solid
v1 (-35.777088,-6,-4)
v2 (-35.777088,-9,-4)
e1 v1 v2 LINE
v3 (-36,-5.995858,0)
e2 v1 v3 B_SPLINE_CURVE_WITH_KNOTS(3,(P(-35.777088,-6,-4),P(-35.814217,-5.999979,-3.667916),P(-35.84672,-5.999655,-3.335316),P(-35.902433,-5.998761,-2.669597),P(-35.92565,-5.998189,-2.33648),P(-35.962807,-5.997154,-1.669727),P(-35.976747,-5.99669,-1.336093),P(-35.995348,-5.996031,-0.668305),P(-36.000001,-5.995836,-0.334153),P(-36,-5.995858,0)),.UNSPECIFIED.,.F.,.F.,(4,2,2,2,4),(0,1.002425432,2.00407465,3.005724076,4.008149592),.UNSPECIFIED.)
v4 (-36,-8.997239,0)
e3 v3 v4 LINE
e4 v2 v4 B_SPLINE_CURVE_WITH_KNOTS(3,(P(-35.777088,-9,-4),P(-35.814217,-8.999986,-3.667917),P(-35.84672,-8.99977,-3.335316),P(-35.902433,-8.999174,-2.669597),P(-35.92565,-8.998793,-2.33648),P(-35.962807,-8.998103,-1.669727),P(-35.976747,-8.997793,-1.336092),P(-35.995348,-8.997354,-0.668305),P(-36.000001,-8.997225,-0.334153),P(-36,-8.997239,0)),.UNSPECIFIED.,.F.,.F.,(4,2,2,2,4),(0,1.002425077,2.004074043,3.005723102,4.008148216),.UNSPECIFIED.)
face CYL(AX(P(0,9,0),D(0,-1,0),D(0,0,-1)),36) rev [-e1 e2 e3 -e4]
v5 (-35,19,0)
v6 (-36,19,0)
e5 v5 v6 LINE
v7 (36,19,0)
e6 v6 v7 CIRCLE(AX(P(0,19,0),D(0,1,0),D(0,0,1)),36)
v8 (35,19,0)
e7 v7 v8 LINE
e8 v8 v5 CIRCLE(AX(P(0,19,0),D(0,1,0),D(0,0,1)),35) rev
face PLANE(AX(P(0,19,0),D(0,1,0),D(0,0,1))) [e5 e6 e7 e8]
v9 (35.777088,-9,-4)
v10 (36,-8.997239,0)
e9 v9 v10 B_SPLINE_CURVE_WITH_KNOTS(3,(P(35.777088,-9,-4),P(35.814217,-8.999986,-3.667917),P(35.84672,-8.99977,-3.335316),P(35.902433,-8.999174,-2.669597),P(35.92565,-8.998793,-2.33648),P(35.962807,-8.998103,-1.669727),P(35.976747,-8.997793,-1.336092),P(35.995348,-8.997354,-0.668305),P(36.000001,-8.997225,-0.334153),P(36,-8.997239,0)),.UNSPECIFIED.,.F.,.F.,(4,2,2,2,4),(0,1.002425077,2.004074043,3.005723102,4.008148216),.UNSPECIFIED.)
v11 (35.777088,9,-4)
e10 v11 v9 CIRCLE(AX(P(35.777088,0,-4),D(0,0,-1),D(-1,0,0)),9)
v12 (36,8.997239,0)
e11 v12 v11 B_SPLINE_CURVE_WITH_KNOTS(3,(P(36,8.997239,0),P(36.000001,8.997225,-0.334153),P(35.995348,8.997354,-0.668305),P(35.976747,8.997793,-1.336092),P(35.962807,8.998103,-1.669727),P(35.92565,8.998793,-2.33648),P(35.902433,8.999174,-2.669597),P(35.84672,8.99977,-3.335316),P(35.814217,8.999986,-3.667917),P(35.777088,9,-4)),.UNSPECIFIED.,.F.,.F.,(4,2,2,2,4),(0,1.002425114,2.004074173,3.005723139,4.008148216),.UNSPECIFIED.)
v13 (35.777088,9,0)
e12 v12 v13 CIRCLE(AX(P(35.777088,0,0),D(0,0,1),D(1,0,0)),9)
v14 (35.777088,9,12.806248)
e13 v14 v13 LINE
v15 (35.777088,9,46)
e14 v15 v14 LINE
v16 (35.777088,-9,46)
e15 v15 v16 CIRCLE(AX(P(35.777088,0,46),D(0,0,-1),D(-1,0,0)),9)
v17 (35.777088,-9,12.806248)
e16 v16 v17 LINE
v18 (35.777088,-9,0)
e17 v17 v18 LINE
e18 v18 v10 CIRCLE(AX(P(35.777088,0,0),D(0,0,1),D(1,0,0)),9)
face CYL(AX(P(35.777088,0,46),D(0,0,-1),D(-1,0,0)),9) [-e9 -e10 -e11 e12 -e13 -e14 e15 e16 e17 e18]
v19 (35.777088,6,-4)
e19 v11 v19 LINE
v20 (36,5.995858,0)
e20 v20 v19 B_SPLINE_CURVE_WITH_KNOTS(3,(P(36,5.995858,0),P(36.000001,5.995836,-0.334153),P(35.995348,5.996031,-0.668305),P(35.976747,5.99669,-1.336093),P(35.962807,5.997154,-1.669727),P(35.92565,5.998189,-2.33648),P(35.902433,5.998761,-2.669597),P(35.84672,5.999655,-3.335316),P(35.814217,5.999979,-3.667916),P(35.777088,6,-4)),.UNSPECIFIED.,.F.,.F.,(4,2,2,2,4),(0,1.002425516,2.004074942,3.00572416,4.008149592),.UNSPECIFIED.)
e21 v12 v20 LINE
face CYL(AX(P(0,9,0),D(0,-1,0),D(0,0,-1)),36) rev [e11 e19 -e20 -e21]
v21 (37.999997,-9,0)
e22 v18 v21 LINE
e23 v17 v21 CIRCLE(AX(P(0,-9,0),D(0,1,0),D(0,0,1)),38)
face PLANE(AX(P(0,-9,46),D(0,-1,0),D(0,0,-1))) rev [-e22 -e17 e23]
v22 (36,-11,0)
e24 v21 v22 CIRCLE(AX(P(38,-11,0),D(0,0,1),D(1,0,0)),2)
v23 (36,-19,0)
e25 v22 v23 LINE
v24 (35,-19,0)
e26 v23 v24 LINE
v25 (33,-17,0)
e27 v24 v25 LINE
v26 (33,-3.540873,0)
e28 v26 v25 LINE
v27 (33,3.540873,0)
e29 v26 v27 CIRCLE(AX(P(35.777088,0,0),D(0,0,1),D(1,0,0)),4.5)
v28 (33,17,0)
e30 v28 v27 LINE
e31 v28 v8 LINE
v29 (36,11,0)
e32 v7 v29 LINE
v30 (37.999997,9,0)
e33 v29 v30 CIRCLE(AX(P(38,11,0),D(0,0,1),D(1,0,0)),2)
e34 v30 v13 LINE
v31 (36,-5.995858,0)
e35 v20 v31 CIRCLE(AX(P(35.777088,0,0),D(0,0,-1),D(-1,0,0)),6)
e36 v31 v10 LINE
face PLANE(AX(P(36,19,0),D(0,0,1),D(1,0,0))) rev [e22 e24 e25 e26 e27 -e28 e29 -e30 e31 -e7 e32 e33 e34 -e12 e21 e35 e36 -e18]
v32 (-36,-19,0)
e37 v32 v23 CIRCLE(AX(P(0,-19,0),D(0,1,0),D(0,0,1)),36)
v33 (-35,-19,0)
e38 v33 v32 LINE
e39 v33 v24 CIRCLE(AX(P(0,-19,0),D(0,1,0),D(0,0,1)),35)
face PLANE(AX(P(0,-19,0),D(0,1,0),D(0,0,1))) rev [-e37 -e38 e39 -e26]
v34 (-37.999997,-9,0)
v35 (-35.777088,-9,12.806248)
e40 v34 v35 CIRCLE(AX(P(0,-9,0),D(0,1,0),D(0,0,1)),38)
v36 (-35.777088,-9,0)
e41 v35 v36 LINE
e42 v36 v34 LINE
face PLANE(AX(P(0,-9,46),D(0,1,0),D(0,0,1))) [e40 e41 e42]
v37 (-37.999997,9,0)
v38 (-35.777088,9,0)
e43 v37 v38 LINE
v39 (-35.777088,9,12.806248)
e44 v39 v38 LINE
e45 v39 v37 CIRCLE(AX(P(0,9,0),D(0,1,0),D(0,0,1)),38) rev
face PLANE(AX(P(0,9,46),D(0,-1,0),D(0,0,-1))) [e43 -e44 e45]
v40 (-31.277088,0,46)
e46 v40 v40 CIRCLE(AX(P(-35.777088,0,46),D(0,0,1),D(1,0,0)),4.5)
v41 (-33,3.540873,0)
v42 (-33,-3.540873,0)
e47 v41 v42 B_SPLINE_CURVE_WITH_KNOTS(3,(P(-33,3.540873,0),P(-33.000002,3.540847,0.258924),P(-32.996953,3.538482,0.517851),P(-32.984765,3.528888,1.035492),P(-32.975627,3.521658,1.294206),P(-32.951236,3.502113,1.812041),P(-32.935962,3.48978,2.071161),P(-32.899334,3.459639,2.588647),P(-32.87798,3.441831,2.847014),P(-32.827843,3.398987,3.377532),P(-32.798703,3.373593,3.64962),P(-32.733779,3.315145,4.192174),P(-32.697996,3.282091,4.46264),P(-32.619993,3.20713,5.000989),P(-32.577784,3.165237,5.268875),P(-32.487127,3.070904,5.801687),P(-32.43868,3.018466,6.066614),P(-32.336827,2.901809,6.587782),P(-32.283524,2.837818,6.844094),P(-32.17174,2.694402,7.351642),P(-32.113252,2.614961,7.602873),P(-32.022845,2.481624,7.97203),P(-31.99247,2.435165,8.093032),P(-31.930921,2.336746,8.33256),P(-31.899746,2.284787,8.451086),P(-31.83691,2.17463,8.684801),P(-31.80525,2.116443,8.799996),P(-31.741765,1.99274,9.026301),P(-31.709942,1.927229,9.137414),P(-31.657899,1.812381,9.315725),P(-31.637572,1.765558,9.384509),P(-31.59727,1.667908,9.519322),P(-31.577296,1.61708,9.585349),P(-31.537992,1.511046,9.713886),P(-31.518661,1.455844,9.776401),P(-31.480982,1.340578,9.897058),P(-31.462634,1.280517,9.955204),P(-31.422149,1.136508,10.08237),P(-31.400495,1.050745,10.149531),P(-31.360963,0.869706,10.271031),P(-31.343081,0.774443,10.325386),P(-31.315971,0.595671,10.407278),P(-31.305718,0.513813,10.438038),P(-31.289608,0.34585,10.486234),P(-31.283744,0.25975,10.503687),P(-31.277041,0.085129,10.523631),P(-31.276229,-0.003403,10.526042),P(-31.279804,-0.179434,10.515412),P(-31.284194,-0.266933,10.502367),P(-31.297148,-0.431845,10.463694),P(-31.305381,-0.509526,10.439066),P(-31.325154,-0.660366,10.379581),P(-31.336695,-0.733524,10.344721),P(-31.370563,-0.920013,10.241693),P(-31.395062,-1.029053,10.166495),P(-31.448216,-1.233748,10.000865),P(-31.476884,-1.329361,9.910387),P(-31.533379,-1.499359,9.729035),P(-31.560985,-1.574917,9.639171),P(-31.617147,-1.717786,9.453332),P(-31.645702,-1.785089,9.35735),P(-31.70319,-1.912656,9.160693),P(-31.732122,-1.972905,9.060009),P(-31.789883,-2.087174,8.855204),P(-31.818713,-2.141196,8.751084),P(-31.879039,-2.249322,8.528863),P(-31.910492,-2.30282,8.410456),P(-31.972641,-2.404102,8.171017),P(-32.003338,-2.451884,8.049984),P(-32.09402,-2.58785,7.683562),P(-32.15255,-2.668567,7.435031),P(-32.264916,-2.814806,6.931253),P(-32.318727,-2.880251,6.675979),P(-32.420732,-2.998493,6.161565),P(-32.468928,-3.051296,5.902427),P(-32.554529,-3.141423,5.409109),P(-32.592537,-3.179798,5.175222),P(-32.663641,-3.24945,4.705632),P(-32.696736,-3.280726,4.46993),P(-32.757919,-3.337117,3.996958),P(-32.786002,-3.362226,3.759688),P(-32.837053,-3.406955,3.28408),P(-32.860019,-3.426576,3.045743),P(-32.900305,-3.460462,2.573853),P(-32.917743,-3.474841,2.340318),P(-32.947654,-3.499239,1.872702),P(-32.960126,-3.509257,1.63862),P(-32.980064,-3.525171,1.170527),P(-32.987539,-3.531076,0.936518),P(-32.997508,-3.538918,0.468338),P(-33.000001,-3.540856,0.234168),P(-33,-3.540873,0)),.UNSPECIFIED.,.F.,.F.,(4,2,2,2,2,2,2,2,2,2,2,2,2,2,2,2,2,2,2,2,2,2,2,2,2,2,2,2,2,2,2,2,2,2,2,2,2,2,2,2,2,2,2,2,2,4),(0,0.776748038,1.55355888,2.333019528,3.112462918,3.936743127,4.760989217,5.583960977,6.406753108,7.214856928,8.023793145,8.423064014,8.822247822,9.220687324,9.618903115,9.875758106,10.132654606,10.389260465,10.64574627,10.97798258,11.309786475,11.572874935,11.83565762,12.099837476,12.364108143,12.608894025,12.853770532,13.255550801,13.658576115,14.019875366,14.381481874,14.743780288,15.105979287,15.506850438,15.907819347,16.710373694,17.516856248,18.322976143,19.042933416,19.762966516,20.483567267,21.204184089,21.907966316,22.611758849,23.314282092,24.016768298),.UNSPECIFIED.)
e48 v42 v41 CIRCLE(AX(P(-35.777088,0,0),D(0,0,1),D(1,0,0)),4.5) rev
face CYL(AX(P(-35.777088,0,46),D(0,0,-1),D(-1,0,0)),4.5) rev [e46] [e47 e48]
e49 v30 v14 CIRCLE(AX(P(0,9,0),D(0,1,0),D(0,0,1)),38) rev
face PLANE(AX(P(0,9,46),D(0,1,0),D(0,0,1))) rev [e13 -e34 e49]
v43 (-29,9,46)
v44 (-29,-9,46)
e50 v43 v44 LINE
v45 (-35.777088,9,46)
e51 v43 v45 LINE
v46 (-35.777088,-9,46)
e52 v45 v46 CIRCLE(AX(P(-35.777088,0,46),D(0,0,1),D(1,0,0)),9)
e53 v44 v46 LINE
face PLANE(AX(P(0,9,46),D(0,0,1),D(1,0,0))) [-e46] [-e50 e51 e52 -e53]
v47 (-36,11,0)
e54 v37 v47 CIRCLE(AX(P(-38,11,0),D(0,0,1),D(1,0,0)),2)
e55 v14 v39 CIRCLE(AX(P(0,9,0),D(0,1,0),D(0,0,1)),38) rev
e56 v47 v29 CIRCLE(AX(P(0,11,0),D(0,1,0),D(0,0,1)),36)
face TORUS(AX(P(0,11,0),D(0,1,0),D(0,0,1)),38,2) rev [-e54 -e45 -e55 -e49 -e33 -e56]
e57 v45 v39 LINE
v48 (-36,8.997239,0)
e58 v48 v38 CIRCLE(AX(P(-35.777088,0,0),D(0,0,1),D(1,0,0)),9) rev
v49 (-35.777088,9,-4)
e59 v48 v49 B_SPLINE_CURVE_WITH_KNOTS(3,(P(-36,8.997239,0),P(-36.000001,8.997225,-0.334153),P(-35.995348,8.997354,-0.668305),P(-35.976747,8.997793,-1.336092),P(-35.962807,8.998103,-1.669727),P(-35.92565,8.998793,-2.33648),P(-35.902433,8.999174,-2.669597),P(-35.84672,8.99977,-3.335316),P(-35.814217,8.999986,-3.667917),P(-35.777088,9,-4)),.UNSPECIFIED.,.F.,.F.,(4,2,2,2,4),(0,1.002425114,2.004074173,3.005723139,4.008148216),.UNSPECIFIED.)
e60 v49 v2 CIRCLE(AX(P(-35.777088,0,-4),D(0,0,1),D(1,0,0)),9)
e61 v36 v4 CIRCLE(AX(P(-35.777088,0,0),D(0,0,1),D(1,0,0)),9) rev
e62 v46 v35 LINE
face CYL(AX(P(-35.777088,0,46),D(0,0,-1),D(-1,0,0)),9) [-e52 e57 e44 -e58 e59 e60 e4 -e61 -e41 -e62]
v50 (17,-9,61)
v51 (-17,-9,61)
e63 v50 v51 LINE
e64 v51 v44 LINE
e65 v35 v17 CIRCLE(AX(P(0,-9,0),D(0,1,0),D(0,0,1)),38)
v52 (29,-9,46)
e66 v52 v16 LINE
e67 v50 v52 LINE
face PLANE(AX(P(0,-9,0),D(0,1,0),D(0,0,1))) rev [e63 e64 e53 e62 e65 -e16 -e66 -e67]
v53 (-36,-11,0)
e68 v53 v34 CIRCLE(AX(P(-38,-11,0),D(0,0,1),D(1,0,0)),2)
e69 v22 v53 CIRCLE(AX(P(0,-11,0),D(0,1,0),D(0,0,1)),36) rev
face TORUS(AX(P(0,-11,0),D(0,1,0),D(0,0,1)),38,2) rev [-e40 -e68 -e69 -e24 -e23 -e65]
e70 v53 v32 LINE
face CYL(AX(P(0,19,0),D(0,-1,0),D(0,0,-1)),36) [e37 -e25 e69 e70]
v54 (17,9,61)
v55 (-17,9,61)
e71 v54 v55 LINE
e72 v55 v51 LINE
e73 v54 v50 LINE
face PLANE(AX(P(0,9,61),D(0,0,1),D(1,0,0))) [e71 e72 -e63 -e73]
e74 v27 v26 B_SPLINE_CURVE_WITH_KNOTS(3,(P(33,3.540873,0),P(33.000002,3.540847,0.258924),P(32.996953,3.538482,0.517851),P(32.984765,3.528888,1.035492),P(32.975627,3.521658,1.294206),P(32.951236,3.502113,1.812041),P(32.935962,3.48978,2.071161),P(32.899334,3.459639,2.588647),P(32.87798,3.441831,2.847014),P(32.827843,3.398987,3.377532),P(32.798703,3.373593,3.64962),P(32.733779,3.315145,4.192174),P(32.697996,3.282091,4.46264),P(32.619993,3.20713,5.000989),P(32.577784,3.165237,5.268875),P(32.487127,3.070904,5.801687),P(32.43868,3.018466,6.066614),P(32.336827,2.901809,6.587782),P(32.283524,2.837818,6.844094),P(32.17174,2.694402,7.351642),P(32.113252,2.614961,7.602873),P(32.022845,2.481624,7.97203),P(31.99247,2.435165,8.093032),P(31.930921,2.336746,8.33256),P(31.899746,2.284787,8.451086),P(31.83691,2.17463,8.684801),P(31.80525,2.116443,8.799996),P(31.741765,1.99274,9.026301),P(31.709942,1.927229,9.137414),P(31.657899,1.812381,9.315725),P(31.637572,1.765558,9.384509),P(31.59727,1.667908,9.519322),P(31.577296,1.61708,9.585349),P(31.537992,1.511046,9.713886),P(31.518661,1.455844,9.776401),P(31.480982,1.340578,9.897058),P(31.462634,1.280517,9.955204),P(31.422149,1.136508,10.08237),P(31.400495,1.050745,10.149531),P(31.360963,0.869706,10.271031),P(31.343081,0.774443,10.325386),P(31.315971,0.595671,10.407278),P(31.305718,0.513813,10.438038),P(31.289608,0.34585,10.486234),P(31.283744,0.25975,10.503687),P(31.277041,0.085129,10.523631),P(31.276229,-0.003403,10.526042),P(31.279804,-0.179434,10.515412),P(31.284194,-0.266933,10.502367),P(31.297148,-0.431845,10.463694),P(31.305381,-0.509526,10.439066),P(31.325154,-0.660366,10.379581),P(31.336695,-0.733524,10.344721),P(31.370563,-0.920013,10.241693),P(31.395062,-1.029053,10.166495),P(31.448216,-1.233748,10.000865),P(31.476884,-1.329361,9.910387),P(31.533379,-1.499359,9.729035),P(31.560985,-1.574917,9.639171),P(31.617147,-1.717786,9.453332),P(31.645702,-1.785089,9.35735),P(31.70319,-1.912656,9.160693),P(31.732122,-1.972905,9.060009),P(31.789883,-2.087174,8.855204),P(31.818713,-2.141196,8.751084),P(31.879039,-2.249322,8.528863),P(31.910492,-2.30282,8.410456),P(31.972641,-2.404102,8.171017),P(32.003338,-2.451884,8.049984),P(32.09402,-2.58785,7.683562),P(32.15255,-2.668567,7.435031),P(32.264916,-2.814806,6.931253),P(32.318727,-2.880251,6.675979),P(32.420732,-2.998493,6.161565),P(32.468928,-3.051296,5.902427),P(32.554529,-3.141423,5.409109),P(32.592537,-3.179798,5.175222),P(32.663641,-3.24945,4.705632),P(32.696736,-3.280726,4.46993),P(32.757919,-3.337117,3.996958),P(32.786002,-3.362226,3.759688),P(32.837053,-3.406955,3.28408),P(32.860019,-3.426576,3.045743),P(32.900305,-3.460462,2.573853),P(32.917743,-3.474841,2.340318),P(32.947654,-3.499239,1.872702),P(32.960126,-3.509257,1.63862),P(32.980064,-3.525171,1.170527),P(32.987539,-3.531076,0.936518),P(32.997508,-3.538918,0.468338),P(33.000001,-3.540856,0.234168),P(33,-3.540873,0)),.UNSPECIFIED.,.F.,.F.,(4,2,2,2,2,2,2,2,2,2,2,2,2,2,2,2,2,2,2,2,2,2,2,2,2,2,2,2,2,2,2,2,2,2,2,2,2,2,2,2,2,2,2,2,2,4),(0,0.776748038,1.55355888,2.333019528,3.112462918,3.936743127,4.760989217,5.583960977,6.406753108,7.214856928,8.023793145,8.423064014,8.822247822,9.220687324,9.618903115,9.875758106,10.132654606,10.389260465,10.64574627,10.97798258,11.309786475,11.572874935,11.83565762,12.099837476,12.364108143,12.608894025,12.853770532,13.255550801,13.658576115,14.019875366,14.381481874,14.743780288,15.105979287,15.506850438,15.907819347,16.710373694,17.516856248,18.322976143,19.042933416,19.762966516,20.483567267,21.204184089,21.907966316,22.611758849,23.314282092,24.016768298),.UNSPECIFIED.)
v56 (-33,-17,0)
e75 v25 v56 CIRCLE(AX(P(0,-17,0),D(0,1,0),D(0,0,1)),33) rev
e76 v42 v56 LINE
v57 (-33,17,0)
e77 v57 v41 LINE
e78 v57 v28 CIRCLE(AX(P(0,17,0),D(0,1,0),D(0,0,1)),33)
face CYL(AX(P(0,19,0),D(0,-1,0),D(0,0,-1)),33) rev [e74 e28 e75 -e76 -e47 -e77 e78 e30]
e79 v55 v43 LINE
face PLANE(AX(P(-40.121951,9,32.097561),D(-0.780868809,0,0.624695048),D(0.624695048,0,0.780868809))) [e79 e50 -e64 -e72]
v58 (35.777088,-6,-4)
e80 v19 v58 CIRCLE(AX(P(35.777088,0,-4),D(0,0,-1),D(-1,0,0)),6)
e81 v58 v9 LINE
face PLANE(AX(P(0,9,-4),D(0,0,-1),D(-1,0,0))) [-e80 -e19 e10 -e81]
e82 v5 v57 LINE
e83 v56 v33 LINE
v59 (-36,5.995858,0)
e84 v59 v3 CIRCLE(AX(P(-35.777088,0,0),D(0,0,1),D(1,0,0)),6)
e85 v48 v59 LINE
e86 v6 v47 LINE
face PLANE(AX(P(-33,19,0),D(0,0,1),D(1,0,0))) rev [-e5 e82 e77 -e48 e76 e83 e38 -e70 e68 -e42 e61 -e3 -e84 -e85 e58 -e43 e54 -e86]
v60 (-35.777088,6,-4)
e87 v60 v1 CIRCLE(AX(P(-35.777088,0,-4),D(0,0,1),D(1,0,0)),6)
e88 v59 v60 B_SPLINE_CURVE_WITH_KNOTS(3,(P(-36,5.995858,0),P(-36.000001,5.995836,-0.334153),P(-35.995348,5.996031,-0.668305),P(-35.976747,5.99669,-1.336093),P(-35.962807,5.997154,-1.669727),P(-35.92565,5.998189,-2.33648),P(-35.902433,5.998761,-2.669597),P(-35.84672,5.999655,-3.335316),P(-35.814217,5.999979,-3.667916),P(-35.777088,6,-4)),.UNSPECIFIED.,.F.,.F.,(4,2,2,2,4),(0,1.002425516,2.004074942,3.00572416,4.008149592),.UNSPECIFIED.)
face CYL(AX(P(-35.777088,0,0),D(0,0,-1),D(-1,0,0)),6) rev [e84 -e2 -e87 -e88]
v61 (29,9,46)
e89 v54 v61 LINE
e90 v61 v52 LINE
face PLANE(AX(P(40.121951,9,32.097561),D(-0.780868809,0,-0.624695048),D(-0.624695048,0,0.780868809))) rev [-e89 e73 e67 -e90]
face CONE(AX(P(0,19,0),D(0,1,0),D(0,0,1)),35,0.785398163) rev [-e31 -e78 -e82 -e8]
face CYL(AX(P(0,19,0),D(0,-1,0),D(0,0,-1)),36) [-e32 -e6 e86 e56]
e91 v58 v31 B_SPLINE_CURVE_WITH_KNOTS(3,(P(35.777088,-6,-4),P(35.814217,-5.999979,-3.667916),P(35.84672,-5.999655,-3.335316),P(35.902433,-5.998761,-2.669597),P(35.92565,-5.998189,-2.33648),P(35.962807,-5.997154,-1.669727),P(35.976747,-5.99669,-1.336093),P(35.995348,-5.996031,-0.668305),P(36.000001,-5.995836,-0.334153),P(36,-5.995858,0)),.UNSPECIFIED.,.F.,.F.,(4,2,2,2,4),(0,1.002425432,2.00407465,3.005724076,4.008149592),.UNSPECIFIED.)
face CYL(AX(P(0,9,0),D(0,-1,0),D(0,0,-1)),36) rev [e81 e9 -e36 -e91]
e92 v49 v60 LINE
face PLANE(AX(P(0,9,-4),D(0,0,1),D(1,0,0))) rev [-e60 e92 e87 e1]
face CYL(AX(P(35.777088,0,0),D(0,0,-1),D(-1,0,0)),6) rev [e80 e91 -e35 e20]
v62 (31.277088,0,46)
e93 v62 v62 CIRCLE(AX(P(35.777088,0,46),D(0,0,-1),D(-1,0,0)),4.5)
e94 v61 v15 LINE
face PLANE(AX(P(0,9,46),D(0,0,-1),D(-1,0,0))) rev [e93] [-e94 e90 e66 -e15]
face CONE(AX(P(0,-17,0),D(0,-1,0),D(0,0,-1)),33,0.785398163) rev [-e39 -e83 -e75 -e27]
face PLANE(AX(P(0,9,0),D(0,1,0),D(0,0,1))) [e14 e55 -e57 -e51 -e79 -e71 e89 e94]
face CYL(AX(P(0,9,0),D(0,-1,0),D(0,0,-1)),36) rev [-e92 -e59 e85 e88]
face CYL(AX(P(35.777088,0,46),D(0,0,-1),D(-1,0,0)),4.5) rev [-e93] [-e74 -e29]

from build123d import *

# Parameters (mm, degrees)
BOSS_EXTRUDE2_DEPTH = 9
BOSS_EXTRUDE3_DEPTH = 19
CHAMFER1_SIZE       = 2
CUT_EXTRUDE1_DEPTH  = 50
SKETCH6_R           = 4.5
CUT_EXTRUDE2_DEPTH  = 50
CUT_EXTRUDE3_DEPTH  = 4
FILLET1_R           = 2


with BuildPart() as part:
    # Sketch1 → Boss-Extrude2 (new, symmetric)
    with BuildSketch(Plane(origin=(0, 0, 0), x_dir=(1, 0, 0), z_dir=(0, 1, 0))):
        with BuildLine():
            Line((-17, -61), (17, -61))
            Line((17, -61), (29, -46))
            Line((29, -46), (44.77708764, -46))
            Line((44.77708764, -46), (44.77708764, 4))
            Line((44.77708764, 4), (35.77708764, 4))
            ThreePointArc((35.77708764, 4), (0, -36), (-35.77708764, 4))
            Line((-35.77708764, 4), (-44.77708764, 4))
            Line((-44.77708764, 4), (-44.77708764, -46))
            Line((-44.77708764, -46), (-29, -46))
            Line((-29, -46), (-17, -61))
        make_face()
    extrude(amount=BOSS_EXTRUDE2_DEPTH, both=True)

    # Sketch3 → Boss-Extrude3 (add, symmetric)
    with BuildSketch(Plane(origin=(0, 0, 0), x_dir=(1, 0, 0), z_dir=(0, 1, 0))):
        with BuildLine():
            Line((36, 0), (33, 0))
            ThreePointArc((33, 0), (0, -33), (-33, 0))
            Line((-33, 0), (-36, 0))
            ThreePointArc((-36, 0), (0, -36), (36, 0))
        make_face()
    extrude(amount=BOSS_EXTRUDE3_DEPTH, both=True)

    # Chamfer1
    chamfer1_edges = [part.edges().sort_by_distance(p)[0] for p in [
        (0, -19, 33),
        (0, 19, 33),
    ]]
    chamfer(chamfer1_edges, length=CHAMFER1_SIZE)

    # Sketch5 → Cut-Extrude1 (cut)
    with BuildSketch(Plane(origin=(0, 0, -4), x_dir=(-1, 0, 0), z_dir=(0, 0, -1))):
        with BuildLine():
            ThreePointArc((-44.77708764, -4.1e-08), (-42.141048685, 6.363961016), (-35.77708764, 9))
            Line((-35.77708764, 9), (-44.77708764, 9))
            Line((-44.77708764, 9), (-44.77708764, -4.1e-08))
        make_face()
        with BuildLine():
            ThreePointArc((-35.77708764, -9), (-42.141048656, -6.363961045), (-44.77708764, -4.1e-08))
            Line((-44.77708764, -4.1e-08), (-44.77708764, -9))
            Line((-44.77708764, -9), (-35.77708764, -9))
        make_face()
    cut_extrude1 = extrude(amount=-CUT_EXTRUDE1_DEPTH, mode=Mode.SUBTRACT)

    # Sketch6 → Cut-Extrude2 (cut)
    with BuildSketch(Plane(origin=(0, 0, -4), x_dir=(-1, 0, 0), z_dir=(0, 0, -1))):
        with Locations((-35.77708764, 0)):
            Circle(SKETCH6_R)
    cut_extrude2 = extrude(amount=-CUT_EXTRUDE2_DEPTH, mode=Mode.SUBTRACT)

    # Sketch7 → Cut-Extrude3 (cut)
    with BuildSketch(Plane(origin=(0, 0, -4), x_dir=(-1, 0, 0), z_dir=(0, 0, -1))):
        with BuildLine():
            Line((-35.77708764, 6), (-35.77708764, 4.5))
            ThreePointArc((-35.77708764, 4.5), (-40.27708764, 0), (-35.77708764, -4.5))
            Line((-35.77708764, -4.5), (-35.77708764, -6))
            ThreePointArc((-35.77708764, -6), (-41.77708764, 0), (-35.77708764, 6))
        make_face()
    cut_extrude3 = extrude(amount=-CUT_EXTRUDE3_DEPTH, mode=Mode.SUBTRACT)

    # Mirror2: Cut-Extrude1, Cut-Extrude2, Cut-Extrude3 across plane
    add(cut_extrude1.mirror(Plane(origin=(0, 0, 0), x_dir=(0, 0, 1), z_dir=(1, 0, 0))), mode=Mode.SUBTRACT)
    add(cut_extrude2.mirror(Plane(origin=(0, 0, 0), x_dir=(0, 0, 1), z_dir=(1, 0, 0))), mode=Mode.SUBTRACT)
    add(cut_extrude3.mirror(Plane(origin=(0, 0, 0), x_dir=(0, 0, 1), z_dir=(1, 0, 0))), mode=Mode.SUBTRACT)

    # Fillet1
    # the kernel refuses this fillet: 2 mm, written as the material it adds along each edge
    with BuildSketch(Plane(origin=(0, -9, 0), x_dir=(0.9996152524995429, 0, -0.027737104576279894), z_dir=(-0.027737104576279894, 0, -0.9996152524995429))) as fillet1_piece_1_section:
        with BuildLine():
            CenterArc((36 + FILLET1_R, FILLET1_R), FILLET1_R, 180, 90)
            Line((36, FILLET1_R), (36, 0))
            Line((36, 0), (36 + FILLET1_R, 0))
        make_face()
    fillet1_piece_1 = revolve(axis=Axis((0, -9, 0), (0, -1, 0)), revolution_arc=183.178845751, mode=Mode.PRIVATE)
    fillet1_piece_1 = split(fillet1_piece_1, bisect_by=Plane(origin=(0, -9, 0), z_dir=(0, 0, 1)), keep=Keep.TOP, mode=Mode.PRIVATE)
    add(fillet1_piece_1)
    with BuildSketch(Plane(origin=(0, 9, 0), x_dir=(0.9996152524995429, 0, -0.027737104576279894), z_dir=(-0.027737104576279894, 0, -0.9996152524995429))) as fillet1_piece_2_section:
        with BuildLine():
            CenterArc((36 + FILLET1_R, -FILLET1_R), FILLET1_R, 90, 90)
            Line((36, -FILLET1_R), (36, 0))
            Line((36, 0), (36 + FILLET1_R, 0))
        make_face()
    fillet1_piece_2 = revolve(axis=Axis((0, 9, 0), (0, -1, 0)), revolution_arc=183.178845751, mode=Mode.PRIVATE)
    fillet1_piece_2 = split(fillet1_piece_2, bisect_by=Plane(origin=(0, 9, 0), z_dir=(0, 0, 1)), keep=Keep.TOP, mode=Mode.PRIVATE)
    add(fillet1_piece_2)


solid = part.part
